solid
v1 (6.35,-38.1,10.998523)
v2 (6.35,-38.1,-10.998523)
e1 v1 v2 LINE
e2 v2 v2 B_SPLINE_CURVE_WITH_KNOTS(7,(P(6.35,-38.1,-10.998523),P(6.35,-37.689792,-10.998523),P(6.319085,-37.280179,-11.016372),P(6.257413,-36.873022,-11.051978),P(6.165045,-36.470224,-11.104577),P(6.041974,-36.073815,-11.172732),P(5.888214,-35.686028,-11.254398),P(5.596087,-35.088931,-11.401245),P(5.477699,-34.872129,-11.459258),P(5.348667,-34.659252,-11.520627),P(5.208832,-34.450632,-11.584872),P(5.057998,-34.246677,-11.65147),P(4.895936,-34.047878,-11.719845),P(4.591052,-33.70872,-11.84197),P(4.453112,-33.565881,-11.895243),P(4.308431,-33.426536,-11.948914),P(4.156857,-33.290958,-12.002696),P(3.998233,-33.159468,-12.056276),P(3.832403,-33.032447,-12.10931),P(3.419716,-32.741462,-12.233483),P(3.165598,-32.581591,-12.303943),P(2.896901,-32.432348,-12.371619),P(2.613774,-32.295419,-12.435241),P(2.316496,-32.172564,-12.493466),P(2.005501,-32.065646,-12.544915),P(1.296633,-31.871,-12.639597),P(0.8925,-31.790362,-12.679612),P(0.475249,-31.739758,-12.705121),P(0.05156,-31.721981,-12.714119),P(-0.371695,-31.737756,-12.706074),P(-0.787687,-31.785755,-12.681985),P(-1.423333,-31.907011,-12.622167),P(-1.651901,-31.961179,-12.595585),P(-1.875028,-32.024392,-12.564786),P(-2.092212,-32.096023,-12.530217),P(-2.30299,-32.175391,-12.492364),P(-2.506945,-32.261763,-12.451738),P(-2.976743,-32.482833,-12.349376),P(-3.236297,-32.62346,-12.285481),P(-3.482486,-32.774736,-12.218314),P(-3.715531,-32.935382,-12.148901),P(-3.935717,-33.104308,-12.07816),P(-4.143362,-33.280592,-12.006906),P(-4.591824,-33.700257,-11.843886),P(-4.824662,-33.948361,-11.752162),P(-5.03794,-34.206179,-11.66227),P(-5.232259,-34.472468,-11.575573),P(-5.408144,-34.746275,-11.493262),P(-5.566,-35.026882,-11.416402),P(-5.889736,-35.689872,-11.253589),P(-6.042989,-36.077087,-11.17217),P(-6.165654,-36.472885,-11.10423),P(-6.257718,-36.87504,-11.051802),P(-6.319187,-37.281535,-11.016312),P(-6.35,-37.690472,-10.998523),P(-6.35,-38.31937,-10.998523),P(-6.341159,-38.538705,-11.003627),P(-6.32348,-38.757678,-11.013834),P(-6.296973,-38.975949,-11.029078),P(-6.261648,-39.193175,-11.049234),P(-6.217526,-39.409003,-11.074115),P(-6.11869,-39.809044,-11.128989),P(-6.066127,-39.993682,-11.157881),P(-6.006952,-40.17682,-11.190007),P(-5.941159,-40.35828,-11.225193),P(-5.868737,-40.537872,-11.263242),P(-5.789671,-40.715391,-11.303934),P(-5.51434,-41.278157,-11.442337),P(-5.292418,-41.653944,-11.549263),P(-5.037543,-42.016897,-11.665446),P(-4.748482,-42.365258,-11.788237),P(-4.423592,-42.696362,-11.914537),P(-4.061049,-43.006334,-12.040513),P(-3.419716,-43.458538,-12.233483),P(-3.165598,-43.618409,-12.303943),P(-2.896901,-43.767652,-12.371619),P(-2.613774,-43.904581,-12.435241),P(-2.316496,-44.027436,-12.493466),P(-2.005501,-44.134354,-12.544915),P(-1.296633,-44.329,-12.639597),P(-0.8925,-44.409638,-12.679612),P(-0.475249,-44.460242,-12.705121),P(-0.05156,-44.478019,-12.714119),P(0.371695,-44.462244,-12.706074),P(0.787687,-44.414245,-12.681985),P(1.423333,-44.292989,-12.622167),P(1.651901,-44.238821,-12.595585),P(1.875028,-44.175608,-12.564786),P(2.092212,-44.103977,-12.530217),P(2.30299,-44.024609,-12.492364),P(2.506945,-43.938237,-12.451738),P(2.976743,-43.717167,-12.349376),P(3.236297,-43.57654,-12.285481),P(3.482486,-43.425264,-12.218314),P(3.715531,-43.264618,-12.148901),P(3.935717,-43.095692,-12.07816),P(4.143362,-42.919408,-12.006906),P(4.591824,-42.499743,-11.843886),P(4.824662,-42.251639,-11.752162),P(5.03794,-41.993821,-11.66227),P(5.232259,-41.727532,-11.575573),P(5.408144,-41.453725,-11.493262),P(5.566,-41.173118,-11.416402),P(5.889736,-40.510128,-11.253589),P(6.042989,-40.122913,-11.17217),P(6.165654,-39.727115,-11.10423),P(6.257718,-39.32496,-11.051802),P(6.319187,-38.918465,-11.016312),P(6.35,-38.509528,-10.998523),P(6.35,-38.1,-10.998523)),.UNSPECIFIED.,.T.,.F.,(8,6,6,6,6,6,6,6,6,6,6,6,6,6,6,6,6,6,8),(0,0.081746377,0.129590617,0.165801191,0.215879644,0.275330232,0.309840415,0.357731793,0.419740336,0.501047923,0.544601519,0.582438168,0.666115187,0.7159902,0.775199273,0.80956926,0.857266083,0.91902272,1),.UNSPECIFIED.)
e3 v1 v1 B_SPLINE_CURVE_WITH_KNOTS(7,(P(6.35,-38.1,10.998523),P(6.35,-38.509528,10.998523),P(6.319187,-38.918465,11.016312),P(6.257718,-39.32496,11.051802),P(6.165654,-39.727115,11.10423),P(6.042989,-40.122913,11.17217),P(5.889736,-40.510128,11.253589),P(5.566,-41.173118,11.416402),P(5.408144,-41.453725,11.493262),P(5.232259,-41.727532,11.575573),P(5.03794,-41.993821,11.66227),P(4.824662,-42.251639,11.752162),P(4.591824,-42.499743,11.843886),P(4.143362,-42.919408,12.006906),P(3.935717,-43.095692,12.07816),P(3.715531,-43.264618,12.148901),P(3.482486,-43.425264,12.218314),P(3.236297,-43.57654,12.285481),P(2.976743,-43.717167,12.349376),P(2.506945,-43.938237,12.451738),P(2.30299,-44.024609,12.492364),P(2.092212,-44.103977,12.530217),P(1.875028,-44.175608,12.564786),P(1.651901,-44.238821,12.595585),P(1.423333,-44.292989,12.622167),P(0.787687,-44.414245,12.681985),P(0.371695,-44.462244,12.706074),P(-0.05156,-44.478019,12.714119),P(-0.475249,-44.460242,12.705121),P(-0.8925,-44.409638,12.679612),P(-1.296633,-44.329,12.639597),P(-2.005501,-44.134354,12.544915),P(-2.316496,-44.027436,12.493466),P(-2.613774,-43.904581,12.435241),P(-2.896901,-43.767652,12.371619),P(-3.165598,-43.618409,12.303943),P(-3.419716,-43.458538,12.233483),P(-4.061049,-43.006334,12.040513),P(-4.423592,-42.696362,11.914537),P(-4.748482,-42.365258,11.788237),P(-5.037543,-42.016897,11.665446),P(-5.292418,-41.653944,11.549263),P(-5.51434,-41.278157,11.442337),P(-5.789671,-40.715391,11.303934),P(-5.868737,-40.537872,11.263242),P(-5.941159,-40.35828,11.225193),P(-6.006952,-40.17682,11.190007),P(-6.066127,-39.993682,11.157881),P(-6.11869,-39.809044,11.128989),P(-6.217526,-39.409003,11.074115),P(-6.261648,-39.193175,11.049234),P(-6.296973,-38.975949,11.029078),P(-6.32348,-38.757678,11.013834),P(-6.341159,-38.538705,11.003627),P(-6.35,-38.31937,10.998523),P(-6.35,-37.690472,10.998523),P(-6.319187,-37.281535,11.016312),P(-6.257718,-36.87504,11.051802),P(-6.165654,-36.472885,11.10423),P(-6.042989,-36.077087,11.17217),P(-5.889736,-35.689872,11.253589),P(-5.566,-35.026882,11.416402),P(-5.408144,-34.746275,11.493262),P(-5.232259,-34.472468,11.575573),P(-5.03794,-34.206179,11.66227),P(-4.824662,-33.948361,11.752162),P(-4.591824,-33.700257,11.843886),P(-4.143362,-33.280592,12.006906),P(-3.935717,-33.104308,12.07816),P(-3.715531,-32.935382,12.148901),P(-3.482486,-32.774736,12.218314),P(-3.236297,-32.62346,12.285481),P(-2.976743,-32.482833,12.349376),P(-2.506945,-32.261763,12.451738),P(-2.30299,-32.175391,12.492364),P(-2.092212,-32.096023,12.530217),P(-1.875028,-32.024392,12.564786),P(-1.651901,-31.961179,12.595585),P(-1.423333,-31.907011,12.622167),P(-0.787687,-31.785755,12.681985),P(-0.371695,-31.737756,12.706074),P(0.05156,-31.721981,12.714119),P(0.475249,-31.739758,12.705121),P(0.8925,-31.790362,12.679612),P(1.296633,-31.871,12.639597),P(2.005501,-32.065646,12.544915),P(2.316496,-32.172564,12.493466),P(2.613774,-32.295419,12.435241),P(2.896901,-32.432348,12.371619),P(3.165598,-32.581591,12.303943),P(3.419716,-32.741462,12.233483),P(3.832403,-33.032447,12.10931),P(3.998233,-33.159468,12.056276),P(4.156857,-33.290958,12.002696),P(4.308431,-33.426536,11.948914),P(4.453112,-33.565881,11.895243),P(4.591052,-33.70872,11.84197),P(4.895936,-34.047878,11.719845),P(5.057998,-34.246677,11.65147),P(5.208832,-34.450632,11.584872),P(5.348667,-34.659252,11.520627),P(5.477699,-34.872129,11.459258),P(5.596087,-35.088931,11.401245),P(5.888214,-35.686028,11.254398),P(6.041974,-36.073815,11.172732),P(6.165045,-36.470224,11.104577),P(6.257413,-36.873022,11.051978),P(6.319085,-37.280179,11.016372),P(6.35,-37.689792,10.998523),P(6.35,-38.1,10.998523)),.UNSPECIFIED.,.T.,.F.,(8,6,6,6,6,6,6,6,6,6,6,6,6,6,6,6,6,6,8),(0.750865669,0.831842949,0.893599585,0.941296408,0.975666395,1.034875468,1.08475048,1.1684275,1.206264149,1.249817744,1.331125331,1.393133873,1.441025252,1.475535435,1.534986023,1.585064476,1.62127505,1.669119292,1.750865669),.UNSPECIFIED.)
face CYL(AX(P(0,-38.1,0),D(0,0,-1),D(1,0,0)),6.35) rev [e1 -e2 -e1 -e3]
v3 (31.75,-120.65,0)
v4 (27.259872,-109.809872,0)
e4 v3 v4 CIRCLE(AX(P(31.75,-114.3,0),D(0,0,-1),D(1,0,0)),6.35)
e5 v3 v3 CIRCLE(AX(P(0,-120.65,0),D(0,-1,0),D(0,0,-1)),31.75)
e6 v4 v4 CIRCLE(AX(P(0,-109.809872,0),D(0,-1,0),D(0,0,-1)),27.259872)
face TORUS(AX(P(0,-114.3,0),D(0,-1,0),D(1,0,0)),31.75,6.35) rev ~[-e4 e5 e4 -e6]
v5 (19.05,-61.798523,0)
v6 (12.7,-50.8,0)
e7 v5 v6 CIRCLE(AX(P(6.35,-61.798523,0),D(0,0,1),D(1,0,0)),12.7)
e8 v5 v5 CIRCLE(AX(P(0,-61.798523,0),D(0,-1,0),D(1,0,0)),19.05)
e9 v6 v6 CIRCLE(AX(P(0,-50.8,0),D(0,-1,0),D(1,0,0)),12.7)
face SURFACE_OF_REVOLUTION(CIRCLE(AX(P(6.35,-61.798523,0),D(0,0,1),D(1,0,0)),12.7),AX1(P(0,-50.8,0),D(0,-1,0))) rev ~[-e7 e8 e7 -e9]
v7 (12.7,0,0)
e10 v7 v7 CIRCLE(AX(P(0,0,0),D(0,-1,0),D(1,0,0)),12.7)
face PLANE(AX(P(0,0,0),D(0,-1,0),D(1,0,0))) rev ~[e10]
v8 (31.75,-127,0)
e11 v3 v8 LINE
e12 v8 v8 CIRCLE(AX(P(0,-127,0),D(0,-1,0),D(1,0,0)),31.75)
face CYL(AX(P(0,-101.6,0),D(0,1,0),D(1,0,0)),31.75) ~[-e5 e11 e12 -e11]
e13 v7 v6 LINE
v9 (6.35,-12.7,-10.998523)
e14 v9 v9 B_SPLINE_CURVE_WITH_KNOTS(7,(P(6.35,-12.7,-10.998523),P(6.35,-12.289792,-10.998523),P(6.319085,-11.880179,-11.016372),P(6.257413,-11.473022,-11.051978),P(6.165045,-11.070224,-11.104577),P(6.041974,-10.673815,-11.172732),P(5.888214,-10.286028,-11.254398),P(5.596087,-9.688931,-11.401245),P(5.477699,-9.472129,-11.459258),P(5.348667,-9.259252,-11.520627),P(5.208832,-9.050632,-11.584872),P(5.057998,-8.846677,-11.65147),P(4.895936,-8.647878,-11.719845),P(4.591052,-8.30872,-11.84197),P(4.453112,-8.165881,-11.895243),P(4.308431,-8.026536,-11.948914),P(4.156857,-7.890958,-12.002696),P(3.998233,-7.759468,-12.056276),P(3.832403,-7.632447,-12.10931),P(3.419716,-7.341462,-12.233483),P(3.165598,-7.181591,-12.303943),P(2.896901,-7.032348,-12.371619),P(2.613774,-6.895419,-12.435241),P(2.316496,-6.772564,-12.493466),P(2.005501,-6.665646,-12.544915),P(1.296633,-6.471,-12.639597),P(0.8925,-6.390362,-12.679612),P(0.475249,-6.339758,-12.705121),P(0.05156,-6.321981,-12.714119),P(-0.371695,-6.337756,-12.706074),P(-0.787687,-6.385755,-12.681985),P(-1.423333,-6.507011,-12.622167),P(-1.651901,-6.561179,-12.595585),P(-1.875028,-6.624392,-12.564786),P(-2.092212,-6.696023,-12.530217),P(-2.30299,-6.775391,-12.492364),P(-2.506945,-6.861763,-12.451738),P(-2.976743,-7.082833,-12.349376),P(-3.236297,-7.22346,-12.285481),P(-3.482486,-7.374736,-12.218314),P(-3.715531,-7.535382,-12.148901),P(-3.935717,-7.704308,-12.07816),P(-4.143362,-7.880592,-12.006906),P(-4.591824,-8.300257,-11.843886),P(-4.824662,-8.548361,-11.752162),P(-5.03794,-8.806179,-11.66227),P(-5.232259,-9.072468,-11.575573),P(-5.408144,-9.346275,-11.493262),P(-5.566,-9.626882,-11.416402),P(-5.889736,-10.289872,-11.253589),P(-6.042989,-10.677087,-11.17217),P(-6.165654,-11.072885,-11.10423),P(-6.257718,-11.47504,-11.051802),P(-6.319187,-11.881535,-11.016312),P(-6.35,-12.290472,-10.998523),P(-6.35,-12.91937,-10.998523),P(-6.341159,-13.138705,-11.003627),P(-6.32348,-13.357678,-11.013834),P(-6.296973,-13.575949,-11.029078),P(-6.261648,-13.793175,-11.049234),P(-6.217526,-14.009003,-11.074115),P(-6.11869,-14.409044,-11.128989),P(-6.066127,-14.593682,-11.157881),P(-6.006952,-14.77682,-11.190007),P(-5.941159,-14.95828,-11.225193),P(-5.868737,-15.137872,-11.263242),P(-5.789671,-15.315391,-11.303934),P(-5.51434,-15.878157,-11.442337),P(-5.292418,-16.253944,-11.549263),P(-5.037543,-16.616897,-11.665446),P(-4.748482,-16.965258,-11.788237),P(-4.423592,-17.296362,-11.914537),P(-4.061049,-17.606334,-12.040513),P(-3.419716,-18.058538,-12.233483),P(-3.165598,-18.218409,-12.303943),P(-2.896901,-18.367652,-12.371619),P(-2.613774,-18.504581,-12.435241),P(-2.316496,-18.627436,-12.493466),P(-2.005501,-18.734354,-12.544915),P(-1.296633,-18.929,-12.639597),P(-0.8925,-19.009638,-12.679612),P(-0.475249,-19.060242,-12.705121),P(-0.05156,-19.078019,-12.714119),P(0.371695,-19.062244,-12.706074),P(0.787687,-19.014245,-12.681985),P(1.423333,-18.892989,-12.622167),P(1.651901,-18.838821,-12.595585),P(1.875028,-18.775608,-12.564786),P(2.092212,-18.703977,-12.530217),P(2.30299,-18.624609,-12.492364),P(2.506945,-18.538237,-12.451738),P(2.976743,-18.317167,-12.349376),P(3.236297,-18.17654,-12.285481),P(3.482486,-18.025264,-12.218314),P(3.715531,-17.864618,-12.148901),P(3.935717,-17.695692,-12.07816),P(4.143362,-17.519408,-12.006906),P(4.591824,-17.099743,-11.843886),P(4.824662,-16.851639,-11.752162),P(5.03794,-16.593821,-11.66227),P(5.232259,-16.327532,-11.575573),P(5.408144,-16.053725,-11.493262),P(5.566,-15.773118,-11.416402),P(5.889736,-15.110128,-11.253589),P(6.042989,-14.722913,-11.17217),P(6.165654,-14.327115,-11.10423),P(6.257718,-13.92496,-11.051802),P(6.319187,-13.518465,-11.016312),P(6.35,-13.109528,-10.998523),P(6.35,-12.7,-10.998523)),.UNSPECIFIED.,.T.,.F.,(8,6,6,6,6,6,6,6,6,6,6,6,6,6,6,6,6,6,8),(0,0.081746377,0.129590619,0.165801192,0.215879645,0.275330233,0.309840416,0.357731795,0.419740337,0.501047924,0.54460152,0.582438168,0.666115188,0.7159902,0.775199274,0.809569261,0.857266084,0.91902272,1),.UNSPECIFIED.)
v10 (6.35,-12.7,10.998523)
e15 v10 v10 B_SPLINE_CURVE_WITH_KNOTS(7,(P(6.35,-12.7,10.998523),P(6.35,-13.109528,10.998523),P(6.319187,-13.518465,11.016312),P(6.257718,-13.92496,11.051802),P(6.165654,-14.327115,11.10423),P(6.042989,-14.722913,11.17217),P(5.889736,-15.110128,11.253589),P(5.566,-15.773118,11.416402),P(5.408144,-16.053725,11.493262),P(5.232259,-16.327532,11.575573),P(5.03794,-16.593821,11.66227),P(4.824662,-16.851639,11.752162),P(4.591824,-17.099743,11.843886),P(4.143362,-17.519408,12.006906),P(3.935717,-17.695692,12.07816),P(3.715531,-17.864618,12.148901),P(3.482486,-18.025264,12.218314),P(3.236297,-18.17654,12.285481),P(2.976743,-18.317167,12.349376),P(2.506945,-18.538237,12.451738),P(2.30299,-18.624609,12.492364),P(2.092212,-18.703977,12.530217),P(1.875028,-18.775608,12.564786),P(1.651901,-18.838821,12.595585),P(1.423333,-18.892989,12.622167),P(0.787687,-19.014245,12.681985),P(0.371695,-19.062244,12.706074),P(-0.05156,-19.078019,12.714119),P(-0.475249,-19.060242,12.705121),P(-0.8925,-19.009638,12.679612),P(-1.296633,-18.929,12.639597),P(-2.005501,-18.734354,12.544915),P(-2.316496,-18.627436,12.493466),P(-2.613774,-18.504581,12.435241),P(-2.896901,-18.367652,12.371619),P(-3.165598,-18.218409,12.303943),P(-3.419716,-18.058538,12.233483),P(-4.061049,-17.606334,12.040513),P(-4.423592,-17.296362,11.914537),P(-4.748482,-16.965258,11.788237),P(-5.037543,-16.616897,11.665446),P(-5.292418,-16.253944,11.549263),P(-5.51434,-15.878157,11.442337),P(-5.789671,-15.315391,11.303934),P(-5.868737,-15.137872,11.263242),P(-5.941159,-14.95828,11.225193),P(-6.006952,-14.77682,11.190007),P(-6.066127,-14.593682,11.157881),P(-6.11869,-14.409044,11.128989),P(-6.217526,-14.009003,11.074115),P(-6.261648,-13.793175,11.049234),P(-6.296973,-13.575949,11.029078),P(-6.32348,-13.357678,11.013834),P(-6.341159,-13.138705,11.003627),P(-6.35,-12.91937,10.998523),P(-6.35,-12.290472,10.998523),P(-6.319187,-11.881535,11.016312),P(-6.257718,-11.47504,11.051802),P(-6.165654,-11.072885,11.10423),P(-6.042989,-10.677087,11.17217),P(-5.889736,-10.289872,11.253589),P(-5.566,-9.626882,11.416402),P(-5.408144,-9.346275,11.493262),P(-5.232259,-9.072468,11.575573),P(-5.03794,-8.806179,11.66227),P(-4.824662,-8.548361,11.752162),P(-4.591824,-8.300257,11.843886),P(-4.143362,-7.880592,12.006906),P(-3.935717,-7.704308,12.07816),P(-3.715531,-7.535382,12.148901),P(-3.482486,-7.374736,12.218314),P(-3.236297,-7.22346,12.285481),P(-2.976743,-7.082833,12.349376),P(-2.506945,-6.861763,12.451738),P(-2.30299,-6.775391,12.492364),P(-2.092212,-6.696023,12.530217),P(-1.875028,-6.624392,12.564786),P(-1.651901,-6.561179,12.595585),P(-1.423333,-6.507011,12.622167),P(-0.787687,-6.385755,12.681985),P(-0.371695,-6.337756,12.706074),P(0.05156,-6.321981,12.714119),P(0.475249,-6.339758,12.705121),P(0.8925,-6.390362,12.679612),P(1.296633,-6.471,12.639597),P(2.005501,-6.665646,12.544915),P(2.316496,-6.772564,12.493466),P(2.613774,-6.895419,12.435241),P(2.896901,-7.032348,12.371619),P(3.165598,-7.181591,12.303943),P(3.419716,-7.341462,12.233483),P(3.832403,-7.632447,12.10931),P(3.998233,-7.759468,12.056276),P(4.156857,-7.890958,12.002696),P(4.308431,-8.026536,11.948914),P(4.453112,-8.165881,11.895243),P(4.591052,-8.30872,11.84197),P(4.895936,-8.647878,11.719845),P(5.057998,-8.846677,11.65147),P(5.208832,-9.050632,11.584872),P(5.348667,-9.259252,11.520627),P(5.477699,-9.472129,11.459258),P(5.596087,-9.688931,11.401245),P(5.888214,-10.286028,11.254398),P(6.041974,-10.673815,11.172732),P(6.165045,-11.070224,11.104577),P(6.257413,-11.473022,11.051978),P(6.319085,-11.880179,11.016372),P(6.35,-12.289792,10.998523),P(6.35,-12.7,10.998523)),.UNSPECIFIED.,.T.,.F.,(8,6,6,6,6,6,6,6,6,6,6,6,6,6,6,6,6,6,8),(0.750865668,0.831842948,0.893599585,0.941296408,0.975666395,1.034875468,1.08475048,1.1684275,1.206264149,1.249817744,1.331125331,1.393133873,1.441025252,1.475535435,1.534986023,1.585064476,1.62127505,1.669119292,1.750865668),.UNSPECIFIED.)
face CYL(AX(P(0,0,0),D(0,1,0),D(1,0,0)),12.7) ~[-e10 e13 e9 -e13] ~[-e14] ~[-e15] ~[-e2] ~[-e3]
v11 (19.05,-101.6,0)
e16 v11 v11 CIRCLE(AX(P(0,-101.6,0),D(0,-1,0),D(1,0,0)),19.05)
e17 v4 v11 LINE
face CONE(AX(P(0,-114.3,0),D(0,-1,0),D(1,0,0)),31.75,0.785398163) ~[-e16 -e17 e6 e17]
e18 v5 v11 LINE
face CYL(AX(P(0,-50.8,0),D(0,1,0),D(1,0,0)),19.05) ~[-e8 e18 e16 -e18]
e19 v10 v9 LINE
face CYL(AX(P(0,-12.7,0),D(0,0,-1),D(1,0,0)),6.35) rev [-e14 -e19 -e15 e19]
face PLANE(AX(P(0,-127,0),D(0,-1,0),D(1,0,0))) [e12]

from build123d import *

# Parameters (mm, degrees)
F0_R          = 12.7
F1_DEPTH      = 50.8
F2_R          = 19.05
F3_DEPTH      = 50.8
F4_R          = 31.75
F5_DEPTH      = 25.4
F6_R          = 6.35
F7_DEPTH      = 12.7
F7_DEPTH_BACK = 12.7
F8_R          = 6.35
F9_DEPTH      = 12.7
F9_DEPTH_BACK = 12.7
F13_R         = 6.35
F15_S5_R      = 19.05
F15_T6_DEPTH  = 47


# Not quite as in the source:
# - a fillet or chamfer that OpenCascade refuses, or shapes differently, is made with other operations: its cross-section is extruded or revolved along the edge and cut away or added


with BuildPart() as f1:
    # F0 (on Front) → F1 (new body)
    with BuildSketch(Plane.XZ):
        Circle(F0_R)
    extrude(amount=F1_DEPTH)

    # F2 (on face) → F3 (join)
    with BuildSketch(Plane.XZ.offset(50.8)):
        Circle(F2_R)
    extrude(amount=F3_DEPTH)

    # F4 (on face) → F5 (join)
    with BuildSketch(Plane.XZ.offset(101.6)):
        Circle(F4_R)
    extrude(amount=F5_DEPTH)

    # F6 (on Top) → F7 (cut, two sides)
    with BuildSketch(Plane.XY) as f7_sk:
        with Locations((0, -38.1)):
            Circle(F6_R)
    extrude(amount=-F7_DEPTH, mode=Mode.SUBTRACT)
    extrude(f7_sk.sketch, amount=F7_DEPTH_BACK, mode=Mode.SUBTRACT)

    # F8 (on Top) → F9 (cut, two sides)
    with BuildSketch(Plane.XY) as f9_sk:
        with Locations((0, -12.7)):
            Circle(F8_R)
    extrude(amount=-F9_DEPTH, mode=Mode.SUBTRACT)
    extrude(f9_sk.sketch, amount=F9_DEPTH_BACK, mode=Mode.SUBTRACT)

    # F10: fillet of radius 12.7 on 1 edges, made by hand

    # F10_s1 → F10_t2 (revolve, cut)
    with BuildSketch(Plane.XY):
        with BuildLine():
            ThreePointArc((19.05, -61.7985226281), (17.3485226281, -55.4485226281), (12.7, -50.8))
            Line((12.7, -50.8), (19.05, -50.8))
            Line((19.05, -50.8), (19.05, -61.7985226281))
        make_face()
    revolve(axis=Axis((0, -50.8, 0), (0, -1, 0)), mode=Mode.SUBTRACT)

    # F14: sweep along a path in F12
    with BuildLine(Plane.XZ.offset(114.3)) as f14_path:
        CenterArc((0, 0), 31.75, 0, 360)
    # F13 (on Right) → F14 (sweep, cut)
    with BuildSketch(Plane.YZ):
        with Locations((-114.3, 31.75)):
            Circle(F13_R)
    sweep(path=f14_path.line, mode=Mode.SUBTRACT)

    # F15: chamfer of 12.7 on 1 edges, made by hand


with BuildPart() as f15_tool2:
    # F15_s3 → F15_t4 (revolve)
    with BuildSketch(Plane.XY):
        Polygon((31.75, -114.3), (19.05, -101.6), (31.75, -101.6), align=None)
    revolve(axis=Axis((0, -101.6, 0), (0, -1, 0)))

    # F15_s5 → F15_t6 (cut, symmetric)
    with BuildSketch(Plane.XZ.offset(108)):
        Circle(F15_S5_R)
    extrude(amount=F15_T6_DEPTH, both=True, mode=Mode.SUBTRACT)


with BuildPart() as f1_1:
    add(f1.part)

    # F15_t1: cut F15_tool2
    add(f15_tool2.part, mode=Mode.SUBTRACT)


solid = f1_1.part
